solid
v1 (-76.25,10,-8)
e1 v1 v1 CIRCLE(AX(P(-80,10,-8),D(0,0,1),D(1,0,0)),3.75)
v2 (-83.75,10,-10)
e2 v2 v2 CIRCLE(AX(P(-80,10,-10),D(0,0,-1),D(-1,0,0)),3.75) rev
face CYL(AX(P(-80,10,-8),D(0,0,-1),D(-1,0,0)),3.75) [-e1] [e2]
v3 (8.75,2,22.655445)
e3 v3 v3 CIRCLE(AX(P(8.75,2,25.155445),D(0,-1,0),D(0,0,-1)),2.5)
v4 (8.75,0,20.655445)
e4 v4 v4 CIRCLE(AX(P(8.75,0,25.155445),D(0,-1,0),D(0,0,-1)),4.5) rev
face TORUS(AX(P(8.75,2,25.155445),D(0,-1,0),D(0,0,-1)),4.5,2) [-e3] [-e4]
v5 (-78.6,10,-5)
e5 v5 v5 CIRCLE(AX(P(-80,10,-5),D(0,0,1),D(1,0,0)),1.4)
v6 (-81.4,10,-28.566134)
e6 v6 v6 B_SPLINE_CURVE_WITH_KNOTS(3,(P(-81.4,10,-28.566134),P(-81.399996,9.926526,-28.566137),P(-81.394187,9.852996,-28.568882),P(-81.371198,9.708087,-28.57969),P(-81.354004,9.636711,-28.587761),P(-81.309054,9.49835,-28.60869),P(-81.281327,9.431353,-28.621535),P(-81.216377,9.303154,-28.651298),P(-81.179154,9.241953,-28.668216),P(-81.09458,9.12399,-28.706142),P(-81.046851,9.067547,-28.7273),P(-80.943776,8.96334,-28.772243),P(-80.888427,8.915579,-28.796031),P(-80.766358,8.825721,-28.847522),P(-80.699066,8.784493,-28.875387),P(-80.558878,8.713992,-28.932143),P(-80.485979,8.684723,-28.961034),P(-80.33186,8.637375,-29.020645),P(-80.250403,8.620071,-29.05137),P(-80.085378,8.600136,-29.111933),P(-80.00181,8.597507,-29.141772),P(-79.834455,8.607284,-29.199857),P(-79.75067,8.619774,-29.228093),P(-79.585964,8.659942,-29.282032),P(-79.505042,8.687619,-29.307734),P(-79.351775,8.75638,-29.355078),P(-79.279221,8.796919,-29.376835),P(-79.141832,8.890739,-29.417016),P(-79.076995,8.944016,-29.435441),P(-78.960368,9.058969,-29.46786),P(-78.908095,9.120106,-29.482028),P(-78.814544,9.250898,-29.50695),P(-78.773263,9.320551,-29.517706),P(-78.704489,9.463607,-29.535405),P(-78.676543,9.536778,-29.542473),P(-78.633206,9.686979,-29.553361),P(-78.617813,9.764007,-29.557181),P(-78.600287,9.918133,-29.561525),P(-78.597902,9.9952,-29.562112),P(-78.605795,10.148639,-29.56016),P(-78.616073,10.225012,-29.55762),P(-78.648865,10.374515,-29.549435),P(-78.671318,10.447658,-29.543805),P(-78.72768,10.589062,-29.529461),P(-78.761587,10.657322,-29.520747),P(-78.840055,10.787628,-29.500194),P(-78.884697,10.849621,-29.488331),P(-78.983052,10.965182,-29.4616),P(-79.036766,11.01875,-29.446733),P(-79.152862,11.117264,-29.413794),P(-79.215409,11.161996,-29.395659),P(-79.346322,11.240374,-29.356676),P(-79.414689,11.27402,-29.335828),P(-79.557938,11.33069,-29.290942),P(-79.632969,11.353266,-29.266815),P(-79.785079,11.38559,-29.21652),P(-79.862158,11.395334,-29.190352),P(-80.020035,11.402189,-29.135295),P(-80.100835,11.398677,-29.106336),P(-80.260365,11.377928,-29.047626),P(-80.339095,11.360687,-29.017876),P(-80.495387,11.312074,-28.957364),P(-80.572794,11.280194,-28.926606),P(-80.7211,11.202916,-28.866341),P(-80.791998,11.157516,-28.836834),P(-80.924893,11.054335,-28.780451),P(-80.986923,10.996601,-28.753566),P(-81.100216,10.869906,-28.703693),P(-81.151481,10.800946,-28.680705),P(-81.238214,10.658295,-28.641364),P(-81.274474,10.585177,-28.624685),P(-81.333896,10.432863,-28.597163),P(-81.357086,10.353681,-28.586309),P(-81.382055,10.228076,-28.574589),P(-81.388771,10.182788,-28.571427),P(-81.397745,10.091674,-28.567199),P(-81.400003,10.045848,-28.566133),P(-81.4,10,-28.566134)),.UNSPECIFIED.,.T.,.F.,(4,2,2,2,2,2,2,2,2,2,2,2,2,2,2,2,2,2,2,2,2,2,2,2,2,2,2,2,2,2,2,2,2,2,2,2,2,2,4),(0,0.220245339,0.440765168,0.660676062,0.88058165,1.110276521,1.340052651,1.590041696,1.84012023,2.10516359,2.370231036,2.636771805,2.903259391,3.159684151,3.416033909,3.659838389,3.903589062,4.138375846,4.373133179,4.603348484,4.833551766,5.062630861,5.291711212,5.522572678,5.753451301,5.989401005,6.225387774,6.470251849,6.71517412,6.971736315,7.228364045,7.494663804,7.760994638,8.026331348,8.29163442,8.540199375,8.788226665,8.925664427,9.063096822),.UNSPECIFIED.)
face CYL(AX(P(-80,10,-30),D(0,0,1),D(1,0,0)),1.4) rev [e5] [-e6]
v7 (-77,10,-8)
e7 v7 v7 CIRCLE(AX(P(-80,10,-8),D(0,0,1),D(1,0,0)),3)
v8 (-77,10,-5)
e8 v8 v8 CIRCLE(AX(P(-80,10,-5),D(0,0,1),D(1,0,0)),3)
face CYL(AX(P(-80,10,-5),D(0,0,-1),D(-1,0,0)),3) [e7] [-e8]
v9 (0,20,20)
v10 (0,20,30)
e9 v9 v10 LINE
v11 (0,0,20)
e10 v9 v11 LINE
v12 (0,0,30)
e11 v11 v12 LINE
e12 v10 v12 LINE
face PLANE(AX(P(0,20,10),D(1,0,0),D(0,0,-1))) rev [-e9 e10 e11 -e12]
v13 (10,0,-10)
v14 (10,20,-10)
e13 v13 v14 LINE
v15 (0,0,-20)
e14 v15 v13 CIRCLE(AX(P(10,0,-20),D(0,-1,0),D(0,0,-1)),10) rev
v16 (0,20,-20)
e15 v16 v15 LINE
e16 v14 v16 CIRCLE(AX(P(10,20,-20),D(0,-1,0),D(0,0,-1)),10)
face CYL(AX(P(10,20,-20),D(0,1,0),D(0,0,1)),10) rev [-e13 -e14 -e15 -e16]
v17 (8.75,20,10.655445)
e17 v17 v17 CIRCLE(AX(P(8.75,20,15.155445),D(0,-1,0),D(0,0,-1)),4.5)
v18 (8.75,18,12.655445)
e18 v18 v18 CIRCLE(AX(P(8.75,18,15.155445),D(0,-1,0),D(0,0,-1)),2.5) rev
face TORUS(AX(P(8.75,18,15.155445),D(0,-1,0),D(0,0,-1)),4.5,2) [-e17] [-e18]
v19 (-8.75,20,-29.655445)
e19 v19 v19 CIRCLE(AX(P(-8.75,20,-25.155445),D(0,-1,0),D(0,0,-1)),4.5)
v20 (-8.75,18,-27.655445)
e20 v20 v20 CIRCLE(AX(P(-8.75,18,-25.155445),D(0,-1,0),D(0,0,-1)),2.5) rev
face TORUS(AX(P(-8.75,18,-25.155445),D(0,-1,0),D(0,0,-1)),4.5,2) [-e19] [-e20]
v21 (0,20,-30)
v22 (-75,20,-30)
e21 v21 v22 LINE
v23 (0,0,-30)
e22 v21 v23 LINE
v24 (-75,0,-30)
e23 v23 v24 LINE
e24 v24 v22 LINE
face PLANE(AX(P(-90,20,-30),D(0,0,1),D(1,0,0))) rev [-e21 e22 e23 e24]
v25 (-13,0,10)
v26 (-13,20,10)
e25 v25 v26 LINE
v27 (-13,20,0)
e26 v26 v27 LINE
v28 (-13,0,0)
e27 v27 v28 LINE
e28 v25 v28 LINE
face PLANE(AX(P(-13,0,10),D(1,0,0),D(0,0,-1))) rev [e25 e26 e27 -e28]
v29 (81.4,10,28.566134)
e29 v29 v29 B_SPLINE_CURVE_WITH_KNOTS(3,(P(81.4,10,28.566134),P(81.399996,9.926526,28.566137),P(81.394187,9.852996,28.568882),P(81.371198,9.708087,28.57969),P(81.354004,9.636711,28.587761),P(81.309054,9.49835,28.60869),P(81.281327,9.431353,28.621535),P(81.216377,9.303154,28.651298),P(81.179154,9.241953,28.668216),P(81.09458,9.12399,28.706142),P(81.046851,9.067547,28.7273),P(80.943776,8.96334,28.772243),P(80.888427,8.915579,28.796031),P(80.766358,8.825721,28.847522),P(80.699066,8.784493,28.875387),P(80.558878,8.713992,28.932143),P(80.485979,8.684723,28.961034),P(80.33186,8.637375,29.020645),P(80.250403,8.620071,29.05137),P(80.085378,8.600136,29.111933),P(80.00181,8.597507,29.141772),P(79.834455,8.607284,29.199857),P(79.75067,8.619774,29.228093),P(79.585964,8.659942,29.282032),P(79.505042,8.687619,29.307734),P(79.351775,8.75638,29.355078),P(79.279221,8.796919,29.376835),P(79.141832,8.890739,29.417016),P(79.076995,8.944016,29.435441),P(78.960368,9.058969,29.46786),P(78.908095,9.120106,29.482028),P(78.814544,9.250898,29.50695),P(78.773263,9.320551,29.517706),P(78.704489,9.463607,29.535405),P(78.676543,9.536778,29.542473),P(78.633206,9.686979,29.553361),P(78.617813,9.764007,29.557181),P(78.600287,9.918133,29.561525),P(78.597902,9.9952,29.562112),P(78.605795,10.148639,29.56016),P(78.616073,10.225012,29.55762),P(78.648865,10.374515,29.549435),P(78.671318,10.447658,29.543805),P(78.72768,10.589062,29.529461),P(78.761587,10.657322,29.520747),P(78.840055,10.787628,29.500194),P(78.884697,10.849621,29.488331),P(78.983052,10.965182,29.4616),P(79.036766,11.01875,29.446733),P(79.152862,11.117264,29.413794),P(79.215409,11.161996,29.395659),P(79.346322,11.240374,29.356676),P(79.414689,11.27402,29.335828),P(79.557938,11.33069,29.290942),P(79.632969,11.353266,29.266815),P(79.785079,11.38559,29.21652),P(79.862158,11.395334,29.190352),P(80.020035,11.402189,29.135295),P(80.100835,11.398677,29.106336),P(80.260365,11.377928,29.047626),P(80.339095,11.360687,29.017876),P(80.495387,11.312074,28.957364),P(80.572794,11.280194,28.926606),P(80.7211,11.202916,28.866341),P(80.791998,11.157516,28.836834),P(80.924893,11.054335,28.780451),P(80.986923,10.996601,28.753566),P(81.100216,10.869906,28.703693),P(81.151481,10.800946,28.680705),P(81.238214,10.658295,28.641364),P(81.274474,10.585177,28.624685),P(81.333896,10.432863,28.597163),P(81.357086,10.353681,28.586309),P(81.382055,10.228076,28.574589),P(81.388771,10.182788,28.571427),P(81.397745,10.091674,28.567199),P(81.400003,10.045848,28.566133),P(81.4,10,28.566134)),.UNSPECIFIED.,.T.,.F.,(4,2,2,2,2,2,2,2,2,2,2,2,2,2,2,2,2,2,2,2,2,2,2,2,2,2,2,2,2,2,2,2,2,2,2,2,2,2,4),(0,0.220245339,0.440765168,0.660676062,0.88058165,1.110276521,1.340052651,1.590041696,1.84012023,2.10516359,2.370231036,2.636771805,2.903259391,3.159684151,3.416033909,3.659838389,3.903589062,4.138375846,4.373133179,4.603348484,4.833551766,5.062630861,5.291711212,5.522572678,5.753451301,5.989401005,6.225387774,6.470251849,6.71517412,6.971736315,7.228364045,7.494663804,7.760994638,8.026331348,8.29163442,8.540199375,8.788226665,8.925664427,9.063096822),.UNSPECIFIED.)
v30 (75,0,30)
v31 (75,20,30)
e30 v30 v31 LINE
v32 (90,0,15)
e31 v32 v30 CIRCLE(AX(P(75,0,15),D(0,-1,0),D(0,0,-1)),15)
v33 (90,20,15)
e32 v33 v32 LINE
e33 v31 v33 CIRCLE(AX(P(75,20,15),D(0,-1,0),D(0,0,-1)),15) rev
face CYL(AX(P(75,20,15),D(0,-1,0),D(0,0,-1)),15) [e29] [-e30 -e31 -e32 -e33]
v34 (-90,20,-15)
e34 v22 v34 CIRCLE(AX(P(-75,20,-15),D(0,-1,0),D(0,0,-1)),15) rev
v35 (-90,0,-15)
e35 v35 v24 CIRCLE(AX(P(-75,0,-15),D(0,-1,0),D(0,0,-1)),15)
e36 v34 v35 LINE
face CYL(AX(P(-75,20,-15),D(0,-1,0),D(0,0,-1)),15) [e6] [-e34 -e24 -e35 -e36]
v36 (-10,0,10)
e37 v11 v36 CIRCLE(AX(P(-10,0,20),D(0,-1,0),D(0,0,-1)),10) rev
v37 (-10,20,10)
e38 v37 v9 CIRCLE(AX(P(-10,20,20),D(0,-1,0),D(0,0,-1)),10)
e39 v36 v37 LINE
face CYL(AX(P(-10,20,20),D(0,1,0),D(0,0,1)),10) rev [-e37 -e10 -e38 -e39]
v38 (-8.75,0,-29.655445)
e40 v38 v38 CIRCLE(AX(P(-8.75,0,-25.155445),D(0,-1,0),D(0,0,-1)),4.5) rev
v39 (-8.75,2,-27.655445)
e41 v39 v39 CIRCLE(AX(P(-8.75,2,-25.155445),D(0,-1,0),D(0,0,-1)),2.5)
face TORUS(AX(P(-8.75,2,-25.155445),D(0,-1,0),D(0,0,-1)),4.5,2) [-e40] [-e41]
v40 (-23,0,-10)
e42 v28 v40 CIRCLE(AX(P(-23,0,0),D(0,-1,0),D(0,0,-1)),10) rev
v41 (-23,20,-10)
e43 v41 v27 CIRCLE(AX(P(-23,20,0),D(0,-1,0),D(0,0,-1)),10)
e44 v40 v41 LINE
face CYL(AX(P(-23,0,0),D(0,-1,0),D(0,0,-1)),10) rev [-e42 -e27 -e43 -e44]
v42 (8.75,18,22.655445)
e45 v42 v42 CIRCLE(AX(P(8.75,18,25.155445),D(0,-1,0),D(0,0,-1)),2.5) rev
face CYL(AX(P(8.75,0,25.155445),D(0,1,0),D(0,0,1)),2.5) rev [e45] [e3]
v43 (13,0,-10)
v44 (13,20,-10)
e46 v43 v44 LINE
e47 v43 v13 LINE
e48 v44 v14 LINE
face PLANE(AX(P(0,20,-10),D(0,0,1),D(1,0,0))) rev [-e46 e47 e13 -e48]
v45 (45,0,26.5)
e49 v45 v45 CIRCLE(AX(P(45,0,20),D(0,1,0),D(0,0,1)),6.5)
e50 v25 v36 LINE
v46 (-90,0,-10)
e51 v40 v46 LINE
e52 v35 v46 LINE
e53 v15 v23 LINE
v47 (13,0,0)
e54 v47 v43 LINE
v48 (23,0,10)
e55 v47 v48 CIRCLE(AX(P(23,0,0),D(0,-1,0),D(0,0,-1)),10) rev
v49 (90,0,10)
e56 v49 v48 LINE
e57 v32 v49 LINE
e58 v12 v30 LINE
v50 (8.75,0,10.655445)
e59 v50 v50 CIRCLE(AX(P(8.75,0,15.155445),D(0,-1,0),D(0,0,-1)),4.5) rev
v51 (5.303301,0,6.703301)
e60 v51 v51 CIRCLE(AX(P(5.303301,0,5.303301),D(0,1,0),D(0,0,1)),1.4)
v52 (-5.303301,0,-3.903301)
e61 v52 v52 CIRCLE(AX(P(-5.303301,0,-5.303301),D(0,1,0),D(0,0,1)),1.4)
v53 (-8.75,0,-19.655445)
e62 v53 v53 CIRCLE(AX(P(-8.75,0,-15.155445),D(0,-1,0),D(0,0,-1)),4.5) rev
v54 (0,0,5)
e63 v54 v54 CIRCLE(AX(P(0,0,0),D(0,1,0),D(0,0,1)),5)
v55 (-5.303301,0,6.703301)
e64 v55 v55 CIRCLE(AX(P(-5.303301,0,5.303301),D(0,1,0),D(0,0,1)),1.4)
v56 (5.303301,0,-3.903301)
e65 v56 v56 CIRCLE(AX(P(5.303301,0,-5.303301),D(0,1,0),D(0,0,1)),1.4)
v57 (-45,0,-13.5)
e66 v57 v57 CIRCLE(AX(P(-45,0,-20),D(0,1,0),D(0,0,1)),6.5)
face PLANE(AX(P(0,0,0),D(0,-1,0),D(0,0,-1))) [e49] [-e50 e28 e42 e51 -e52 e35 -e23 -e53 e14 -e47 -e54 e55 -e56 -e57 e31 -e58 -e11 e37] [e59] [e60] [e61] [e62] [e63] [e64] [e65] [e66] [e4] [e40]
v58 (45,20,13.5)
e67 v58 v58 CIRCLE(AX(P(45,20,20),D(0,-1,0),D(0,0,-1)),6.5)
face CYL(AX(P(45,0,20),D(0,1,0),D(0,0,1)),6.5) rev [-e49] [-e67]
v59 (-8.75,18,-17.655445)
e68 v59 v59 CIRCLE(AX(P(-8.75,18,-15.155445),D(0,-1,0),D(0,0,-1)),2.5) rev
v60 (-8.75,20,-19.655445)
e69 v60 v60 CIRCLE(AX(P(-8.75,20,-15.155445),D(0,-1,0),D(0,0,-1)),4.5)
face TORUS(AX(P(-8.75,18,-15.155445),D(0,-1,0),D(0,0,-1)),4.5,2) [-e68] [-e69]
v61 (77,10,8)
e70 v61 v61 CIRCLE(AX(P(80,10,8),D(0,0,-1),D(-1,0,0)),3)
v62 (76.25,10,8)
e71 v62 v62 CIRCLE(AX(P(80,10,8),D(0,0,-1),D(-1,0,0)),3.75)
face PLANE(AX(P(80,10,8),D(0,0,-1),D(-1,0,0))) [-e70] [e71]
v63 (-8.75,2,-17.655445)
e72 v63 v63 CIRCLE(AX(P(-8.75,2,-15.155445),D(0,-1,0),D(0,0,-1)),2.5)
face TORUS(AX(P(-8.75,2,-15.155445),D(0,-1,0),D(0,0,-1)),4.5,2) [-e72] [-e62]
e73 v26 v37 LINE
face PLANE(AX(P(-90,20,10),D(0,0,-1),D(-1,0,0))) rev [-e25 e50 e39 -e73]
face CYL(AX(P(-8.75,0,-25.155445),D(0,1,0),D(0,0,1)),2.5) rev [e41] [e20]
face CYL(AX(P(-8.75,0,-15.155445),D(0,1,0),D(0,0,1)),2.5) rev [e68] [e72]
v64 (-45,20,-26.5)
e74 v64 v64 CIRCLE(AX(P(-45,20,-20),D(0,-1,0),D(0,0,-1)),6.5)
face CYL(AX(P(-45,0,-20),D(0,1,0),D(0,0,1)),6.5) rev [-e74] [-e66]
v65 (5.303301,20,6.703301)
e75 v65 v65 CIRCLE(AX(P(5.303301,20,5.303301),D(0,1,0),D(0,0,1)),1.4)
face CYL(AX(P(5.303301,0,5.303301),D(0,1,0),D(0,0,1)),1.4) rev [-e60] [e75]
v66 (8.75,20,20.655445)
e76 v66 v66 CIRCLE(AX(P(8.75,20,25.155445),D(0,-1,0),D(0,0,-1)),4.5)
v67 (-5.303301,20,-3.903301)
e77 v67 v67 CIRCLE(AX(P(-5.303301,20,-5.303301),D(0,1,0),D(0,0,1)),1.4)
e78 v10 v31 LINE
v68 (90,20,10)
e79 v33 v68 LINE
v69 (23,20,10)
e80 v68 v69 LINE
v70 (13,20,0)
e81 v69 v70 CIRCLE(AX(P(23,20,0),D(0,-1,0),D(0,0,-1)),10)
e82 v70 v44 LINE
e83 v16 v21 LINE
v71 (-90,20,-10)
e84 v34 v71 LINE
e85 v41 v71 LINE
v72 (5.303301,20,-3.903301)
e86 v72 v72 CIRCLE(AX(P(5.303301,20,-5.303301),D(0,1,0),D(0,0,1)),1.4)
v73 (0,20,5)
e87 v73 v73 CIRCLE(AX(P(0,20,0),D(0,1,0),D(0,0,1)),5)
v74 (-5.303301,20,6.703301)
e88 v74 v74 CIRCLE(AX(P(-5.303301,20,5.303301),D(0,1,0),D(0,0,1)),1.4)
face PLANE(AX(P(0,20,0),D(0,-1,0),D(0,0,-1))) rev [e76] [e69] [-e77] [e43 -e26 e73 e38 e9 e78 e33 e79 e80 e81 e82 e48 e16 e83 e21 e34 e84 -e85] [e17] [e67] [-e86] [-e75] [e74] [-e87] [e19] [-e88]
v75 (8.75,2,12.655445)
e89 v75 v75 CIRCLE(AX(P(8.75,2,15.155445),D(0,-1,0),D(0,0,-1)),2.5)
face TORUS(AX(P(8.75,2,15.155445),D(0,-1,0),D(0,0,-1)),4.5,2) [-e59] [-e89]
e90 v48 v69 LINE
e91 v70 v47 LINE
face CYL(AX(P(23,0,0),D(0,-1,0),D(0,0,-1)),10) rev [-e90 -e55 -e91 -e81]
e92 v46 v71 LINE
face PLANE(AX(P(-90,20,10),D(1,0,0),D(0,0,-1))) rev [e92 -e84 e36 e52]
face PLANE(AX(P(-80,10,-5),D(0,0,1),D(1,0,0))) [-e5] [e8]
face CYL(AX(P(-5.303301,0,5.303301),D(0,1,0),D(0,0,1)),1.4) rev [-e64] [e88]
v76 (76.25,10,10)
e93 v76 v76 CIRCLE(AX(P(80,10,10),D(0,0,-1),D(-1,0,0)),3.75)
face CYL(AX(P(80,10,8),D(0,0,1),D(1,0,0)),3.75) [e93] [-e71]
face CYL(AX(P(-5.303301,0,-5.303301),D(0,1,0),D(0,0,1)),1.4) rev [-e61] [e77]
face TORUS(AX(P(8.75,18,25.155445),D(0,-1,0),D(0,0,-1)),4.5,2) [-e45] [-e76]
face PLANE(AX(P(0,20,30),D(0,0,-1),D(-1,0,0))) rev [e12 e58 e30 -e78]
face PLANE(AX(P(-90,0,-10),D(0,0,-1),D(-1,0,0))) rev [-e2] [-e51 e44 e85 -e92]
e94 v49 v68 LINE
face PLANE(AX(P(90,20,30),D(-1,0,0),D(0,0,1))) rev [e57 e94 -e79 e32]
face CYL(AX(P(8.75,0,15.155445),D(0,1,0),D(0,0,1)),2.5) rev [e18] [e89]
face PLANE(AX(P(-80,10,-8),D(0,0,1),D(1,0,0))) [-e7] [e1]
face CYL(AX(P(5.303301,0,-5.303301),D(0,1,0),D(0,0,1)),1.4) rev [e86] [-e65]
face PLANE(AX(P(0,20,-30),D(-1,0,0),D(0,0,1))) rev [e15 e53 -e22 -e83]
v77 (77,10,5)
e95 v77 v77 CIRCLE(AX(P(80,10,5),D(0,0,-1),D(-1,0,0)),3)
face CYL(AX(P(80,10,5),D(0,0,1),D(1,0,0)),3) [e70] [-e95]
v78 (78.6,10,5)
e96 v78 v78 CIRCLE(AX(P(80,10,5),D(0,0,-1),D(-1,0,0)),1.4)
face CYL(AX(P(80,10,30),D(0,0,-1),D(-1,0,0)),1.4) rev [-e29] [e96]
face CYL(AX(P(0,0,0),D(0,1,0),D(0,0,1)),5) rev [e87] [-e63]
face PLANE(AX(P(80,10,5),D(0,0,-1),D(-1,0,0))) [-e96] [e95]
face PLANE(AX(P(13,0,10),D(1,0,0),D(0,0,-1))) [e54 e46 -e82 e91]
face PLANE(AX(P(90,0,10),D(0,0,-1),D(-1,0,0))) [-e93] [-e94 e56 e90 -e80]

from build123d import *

# Parameters (mm, degrees)
BOSS_EXTRUDE1_DEPTH     = 20
SKETCH2_R               = 5
SKETCH2_R_2             = 1.4
CUT_EXTRUDE1_DEPTH      = 97.953597148
SKETCH3_W               = 77
SKETCH3_H               = 20
CUT_EXTRUDE2_DEPTH      = 97.953597148
SKETCH4_R               = 3.75
BOSS_EXTRUDE2_DEPTH     = 2
SKETCH5_R               = 3
BOSS_EXTRUDE3_DEPTH     = 3
SKETCH6_R               = 1.4
CUT_EXTRUDE3_DEPTH      = 99.615414617
SKETCH7_R               = 3.75
BOSS_EXTRUDE4_DEPTH     = 2
SKETCH8_R               = 3
BOSS_EXTRUDE5_DEPTH     = 3
SKETCH9_R               = 1.4
CUT_EXTRUDE4_DEPTH      = 99.615414617
FILLET1_R               = 10
CUT_EXTRUDE5_DEPTH      = 97.953597148
CUT_EXTRUDE5_DEPTH_BACK = 97.953597148
SKETCH12_R              = 2.5
FILLET2_R               = 2
FILLET3_R               = 2
CUT_EXTRUDE6_DEPTH      = 97.953597169
CUT_EXTRUDE6_DEPTH_BACK = 97.953597169
SKETCH13_R              = 6.5
FILLET4_R               = 15


with BuildPart() as part:
    # Sketch1 → Boss-Extrude1 (new body)
    with BuildSketch(Plane(origin=(0, 0, 0), x_dir=(1, 0, 0), z_dir=(0, 1, 0))):
        Polygon((-90, 10), (-90, 30), (0, 30), (0, 10), (90, 10), (90, -10), (90, -30), (0, -30), (0, -10), (-90, -10), align=None)
    extrude(amount=BOSS_EXTRUDE1_DEPTH)

    # Sketch2 → Cut-Extrude1 (cut, through all)
    with BuildSketch(Plane(origin=(0, 20, 0), x_dir=(1, 0, 0), z_dir=(0, 1, 0))):
        with Locations(Location((0, 0, 0), (0, 0, 270))):
            Circle(SKETCH2_R)
        with Locations(Location((-5.303300859, 5.303300859, 0), (0, 0, 270))):
            Circle(SKETCH2_R_2)
        with Locations(Location((5.303300859, 5.303300859, 0), (0, 0, 270))):
            Circle(SKETCH2_R_2)
        with Locations(Location((5.303300859, -5.303300859, 0), (0, 0, 270))):
            Circle(SKETCH2_R_2)
        with Locations(Location((-5.303300859, -5.303300859, 0), (0, 0, 270))):
            Circle(SKETCH2_R_2)
    extrude(amount=-CUT_EXTRUDE1_DEPTH, mode=Mode.SUBTRACT)

    # Sketch3 → Cut-Extrude2 (cut, through all)
    with BuildSketch(Plane(origin=(0, 20, 0), x_dir=(1, 0, 0), z_dir=(0, 1, 0))):
        with Locations((-51.5, 0)):
            Rectangle(SKETCH3_W, SKETCH3_H)
    cut_extrude2 = extrude(amount=-CUT_EXTRUDE2_DEPTH, mode=Mode.SUBTRACT)

    # Mirror1: Cut-Extrude2 across plane
    add(cut_extrude2.mirror(Plane(origin=(0, 0, 0), x_dir=(0, 0, 1), z_dir=(1, 0, 0))), mode=Mode.SUBTRACT)

    # Sketch4 → Boss-Extrude2 (add)
    with BuildSketch(Plane.XY.offset(-10)):
        with Locations(Location((-80, 10, 0), (0, 0, 180))):
            Circle(SKETCH4_R)
    extrude(amount=BOSS_EXTRUDE2_DEPTH)

    # Sketch5 → Boss-Extrude3 (add)
    with BuildSketch(Plane.XY.offset(-8)):
        with Locations((-80, 10)):
            Circle(SKETCH5_R)
    extrude(amount=BOSS_EXTRUDE3_DEPTH)

    # Sketch6 → Cut-Extrude3 (cut, through all)
    with BuildSketch(Plane.XY.offset(-5)):
        with Locations((-80, 10)):
            Circle(SKETCH6_R)
    extrude(amount=-CUT_EXTRUDE3_DEPTH, mode=Mode.SUBTRACT)

    # Sketch7 → Boss-Extrude4 (add)
    with BuildSketch(Plane(origin=(0, 0, 10), x_dir=(-1, 0, 0), z_dir=(0, 0, -1))):
        with Locations((-80, 10)):
            Circle(SKETCH7_R)
    extrude(amount=BOSS_EXTRUDE4_DEPTH)

    # Sketch8 → Boss-Extrude5 (add)
    with BuildSketch(Plane(origin=(0, 0, 8), x_dir=(-1, 0, 0), z_dir=(0, 0, -1))):
        with Locations((-80, 10)):
            Circle(SKETCH8_R)
    extrude(amount=BOSS_EXTRUDE5_DEPTH)

    # Sketch9 → Cut-Extrude4 (cut, through all)
    with BuildSketch(Plane(origin=(0, 0, 5), x_dir=(-1, 0, 0), z_dir=(0, 0, -1))):
        with Locations((-80, 10)):
            Circle(SKETCH9_R)
    extrude(amount=-CUT_EXTRUDE4_DEPTH, mode=Mode.SUBTRACT)

    # Fillet1
    fillet1_edges = [part.edges().sort_by_distance(p)[0] for p in [
        (0, 10, 10),
        (0, 10, -10),
        (-13, 10, -10),
        (13, 10, 10),
    ]]
    fillet(fillet1_edges, radius=FILLET1_R)

    # Sketch12 → Cut-Extrude5 (cut, two sides: drawn at the far end of the back side and taken through both)
    with BuildSketch(Plane(origin=(0, 20, 0), x_dir=(1, 0, 0), z_dir=(0, 1, 0)).offset(-CUT_EXTRUDE5_DEPTH_BACK)):
        with Locations(Location((8.75, -15.155444566, 0), (0, 0, 270))):
            Circle(SKETCH12_R)
        with Locations(Location((8.75, -25.155444566, 0), (0, 0, 270))):
            Circle(SKETCH12_R)
        with Locations(Location((-8.75, 25.155444566, 0), (0, 0, 270))):
            Circle(SKETCH12_R)
        with Locations(Location((-8.75, 15.155444566, 0), (0, 0, 270))):
            Circle(SKETCH12_R)
    extrude(amount=CUT_EXTRUDE5_DEPTH + CUT_EXTRUDE5_DEPTH_BACK, mode=Mode.SUBTRACT)

    # Fillet2
    fillet2_edges = [part.edges().sort_by_distance(p)[0] for p in [
        (8.75, 20, 22.655444566),
        (-8.75, 20, -27.655444566),
        (-8.75, 20, -17.655444566),
        (8.75, 20, 12.655444566),
    ]]
    fillet(fillet2_edges, radius=FILLET2_R)

    # Fillet3
    fillet3_edges = [part.edges().sort_by_distance(p)[0] for p in [
        (8.75, 0, 22.655444566),
        (-8.75, 0, -27.655444566),
        (-8.75, 0, -17.655444566),
        (8.75, 0, 12.655444566),
    ]]
    fillet(fillet3_edges, radius=FILLET3_R)

    # Sketch13 → Cut-Extrude6 (cut, two sides: drawn at the far end of the back side and taken through both)
    with BuildSketch(Plane(origin=(0, 20, 0), x_dir=(1, 0, 0), z_dir=(0, 1, 0)).offset(-CUT_EXTRUDE6_DEPTH_BACK)):
        with Locations(Location((-45, 20, 0), (0, 0, 270))):
            Circle(SKETCH13_R)
        with Locations(Location((45, -20, 0), (0, 0, 270))):
            Circle(SKETCH13_R)
    extrude(amount=CUT_EXTRUDE6_DEPTH + CUT_EXTRUDE6_DEPTH_BACK, mode=Mode.SUBTRACT)

    # Fillet4
    # the kernel refuses this fillet: 15 mm, written as the material it takes off along each edge
    with BuildSketch(Plane(origin=(90, -37.5, 30), x_dir=(-1, 0, 0), z_dir=(0, 1, 0))) as fillet4_piece_1:
        with BuildLine():
            CenterArc((FILLET4_R, -FILLET4_R), FILLET4_R, 90, 90)
            Line((0, -FILLET4_R), (0, 0))
            Line((0, 0), (FILLET4_R, 0))
        make_face()
    extrude(amount=95, mode=Mode.SUBTRACT)
    with BuildSketch(Plane(origin=(-90, -37.5, -30), x_dir=(0, 0, 1), z_dir=(0, 1, 0))) as fillet4_piece_2:
        with BuildLine():
            CenterArc((FILLET4_R, FILLET4_R), FILLET4_R, 180, 90)
            Line((0, FILLET4_R), (0, 0))
            Line((0, 0), (FILLET4_R, 0))
        make_face()
    extrude(amount=95, mode=Mode.SUBTRACT)


solid = part.part
